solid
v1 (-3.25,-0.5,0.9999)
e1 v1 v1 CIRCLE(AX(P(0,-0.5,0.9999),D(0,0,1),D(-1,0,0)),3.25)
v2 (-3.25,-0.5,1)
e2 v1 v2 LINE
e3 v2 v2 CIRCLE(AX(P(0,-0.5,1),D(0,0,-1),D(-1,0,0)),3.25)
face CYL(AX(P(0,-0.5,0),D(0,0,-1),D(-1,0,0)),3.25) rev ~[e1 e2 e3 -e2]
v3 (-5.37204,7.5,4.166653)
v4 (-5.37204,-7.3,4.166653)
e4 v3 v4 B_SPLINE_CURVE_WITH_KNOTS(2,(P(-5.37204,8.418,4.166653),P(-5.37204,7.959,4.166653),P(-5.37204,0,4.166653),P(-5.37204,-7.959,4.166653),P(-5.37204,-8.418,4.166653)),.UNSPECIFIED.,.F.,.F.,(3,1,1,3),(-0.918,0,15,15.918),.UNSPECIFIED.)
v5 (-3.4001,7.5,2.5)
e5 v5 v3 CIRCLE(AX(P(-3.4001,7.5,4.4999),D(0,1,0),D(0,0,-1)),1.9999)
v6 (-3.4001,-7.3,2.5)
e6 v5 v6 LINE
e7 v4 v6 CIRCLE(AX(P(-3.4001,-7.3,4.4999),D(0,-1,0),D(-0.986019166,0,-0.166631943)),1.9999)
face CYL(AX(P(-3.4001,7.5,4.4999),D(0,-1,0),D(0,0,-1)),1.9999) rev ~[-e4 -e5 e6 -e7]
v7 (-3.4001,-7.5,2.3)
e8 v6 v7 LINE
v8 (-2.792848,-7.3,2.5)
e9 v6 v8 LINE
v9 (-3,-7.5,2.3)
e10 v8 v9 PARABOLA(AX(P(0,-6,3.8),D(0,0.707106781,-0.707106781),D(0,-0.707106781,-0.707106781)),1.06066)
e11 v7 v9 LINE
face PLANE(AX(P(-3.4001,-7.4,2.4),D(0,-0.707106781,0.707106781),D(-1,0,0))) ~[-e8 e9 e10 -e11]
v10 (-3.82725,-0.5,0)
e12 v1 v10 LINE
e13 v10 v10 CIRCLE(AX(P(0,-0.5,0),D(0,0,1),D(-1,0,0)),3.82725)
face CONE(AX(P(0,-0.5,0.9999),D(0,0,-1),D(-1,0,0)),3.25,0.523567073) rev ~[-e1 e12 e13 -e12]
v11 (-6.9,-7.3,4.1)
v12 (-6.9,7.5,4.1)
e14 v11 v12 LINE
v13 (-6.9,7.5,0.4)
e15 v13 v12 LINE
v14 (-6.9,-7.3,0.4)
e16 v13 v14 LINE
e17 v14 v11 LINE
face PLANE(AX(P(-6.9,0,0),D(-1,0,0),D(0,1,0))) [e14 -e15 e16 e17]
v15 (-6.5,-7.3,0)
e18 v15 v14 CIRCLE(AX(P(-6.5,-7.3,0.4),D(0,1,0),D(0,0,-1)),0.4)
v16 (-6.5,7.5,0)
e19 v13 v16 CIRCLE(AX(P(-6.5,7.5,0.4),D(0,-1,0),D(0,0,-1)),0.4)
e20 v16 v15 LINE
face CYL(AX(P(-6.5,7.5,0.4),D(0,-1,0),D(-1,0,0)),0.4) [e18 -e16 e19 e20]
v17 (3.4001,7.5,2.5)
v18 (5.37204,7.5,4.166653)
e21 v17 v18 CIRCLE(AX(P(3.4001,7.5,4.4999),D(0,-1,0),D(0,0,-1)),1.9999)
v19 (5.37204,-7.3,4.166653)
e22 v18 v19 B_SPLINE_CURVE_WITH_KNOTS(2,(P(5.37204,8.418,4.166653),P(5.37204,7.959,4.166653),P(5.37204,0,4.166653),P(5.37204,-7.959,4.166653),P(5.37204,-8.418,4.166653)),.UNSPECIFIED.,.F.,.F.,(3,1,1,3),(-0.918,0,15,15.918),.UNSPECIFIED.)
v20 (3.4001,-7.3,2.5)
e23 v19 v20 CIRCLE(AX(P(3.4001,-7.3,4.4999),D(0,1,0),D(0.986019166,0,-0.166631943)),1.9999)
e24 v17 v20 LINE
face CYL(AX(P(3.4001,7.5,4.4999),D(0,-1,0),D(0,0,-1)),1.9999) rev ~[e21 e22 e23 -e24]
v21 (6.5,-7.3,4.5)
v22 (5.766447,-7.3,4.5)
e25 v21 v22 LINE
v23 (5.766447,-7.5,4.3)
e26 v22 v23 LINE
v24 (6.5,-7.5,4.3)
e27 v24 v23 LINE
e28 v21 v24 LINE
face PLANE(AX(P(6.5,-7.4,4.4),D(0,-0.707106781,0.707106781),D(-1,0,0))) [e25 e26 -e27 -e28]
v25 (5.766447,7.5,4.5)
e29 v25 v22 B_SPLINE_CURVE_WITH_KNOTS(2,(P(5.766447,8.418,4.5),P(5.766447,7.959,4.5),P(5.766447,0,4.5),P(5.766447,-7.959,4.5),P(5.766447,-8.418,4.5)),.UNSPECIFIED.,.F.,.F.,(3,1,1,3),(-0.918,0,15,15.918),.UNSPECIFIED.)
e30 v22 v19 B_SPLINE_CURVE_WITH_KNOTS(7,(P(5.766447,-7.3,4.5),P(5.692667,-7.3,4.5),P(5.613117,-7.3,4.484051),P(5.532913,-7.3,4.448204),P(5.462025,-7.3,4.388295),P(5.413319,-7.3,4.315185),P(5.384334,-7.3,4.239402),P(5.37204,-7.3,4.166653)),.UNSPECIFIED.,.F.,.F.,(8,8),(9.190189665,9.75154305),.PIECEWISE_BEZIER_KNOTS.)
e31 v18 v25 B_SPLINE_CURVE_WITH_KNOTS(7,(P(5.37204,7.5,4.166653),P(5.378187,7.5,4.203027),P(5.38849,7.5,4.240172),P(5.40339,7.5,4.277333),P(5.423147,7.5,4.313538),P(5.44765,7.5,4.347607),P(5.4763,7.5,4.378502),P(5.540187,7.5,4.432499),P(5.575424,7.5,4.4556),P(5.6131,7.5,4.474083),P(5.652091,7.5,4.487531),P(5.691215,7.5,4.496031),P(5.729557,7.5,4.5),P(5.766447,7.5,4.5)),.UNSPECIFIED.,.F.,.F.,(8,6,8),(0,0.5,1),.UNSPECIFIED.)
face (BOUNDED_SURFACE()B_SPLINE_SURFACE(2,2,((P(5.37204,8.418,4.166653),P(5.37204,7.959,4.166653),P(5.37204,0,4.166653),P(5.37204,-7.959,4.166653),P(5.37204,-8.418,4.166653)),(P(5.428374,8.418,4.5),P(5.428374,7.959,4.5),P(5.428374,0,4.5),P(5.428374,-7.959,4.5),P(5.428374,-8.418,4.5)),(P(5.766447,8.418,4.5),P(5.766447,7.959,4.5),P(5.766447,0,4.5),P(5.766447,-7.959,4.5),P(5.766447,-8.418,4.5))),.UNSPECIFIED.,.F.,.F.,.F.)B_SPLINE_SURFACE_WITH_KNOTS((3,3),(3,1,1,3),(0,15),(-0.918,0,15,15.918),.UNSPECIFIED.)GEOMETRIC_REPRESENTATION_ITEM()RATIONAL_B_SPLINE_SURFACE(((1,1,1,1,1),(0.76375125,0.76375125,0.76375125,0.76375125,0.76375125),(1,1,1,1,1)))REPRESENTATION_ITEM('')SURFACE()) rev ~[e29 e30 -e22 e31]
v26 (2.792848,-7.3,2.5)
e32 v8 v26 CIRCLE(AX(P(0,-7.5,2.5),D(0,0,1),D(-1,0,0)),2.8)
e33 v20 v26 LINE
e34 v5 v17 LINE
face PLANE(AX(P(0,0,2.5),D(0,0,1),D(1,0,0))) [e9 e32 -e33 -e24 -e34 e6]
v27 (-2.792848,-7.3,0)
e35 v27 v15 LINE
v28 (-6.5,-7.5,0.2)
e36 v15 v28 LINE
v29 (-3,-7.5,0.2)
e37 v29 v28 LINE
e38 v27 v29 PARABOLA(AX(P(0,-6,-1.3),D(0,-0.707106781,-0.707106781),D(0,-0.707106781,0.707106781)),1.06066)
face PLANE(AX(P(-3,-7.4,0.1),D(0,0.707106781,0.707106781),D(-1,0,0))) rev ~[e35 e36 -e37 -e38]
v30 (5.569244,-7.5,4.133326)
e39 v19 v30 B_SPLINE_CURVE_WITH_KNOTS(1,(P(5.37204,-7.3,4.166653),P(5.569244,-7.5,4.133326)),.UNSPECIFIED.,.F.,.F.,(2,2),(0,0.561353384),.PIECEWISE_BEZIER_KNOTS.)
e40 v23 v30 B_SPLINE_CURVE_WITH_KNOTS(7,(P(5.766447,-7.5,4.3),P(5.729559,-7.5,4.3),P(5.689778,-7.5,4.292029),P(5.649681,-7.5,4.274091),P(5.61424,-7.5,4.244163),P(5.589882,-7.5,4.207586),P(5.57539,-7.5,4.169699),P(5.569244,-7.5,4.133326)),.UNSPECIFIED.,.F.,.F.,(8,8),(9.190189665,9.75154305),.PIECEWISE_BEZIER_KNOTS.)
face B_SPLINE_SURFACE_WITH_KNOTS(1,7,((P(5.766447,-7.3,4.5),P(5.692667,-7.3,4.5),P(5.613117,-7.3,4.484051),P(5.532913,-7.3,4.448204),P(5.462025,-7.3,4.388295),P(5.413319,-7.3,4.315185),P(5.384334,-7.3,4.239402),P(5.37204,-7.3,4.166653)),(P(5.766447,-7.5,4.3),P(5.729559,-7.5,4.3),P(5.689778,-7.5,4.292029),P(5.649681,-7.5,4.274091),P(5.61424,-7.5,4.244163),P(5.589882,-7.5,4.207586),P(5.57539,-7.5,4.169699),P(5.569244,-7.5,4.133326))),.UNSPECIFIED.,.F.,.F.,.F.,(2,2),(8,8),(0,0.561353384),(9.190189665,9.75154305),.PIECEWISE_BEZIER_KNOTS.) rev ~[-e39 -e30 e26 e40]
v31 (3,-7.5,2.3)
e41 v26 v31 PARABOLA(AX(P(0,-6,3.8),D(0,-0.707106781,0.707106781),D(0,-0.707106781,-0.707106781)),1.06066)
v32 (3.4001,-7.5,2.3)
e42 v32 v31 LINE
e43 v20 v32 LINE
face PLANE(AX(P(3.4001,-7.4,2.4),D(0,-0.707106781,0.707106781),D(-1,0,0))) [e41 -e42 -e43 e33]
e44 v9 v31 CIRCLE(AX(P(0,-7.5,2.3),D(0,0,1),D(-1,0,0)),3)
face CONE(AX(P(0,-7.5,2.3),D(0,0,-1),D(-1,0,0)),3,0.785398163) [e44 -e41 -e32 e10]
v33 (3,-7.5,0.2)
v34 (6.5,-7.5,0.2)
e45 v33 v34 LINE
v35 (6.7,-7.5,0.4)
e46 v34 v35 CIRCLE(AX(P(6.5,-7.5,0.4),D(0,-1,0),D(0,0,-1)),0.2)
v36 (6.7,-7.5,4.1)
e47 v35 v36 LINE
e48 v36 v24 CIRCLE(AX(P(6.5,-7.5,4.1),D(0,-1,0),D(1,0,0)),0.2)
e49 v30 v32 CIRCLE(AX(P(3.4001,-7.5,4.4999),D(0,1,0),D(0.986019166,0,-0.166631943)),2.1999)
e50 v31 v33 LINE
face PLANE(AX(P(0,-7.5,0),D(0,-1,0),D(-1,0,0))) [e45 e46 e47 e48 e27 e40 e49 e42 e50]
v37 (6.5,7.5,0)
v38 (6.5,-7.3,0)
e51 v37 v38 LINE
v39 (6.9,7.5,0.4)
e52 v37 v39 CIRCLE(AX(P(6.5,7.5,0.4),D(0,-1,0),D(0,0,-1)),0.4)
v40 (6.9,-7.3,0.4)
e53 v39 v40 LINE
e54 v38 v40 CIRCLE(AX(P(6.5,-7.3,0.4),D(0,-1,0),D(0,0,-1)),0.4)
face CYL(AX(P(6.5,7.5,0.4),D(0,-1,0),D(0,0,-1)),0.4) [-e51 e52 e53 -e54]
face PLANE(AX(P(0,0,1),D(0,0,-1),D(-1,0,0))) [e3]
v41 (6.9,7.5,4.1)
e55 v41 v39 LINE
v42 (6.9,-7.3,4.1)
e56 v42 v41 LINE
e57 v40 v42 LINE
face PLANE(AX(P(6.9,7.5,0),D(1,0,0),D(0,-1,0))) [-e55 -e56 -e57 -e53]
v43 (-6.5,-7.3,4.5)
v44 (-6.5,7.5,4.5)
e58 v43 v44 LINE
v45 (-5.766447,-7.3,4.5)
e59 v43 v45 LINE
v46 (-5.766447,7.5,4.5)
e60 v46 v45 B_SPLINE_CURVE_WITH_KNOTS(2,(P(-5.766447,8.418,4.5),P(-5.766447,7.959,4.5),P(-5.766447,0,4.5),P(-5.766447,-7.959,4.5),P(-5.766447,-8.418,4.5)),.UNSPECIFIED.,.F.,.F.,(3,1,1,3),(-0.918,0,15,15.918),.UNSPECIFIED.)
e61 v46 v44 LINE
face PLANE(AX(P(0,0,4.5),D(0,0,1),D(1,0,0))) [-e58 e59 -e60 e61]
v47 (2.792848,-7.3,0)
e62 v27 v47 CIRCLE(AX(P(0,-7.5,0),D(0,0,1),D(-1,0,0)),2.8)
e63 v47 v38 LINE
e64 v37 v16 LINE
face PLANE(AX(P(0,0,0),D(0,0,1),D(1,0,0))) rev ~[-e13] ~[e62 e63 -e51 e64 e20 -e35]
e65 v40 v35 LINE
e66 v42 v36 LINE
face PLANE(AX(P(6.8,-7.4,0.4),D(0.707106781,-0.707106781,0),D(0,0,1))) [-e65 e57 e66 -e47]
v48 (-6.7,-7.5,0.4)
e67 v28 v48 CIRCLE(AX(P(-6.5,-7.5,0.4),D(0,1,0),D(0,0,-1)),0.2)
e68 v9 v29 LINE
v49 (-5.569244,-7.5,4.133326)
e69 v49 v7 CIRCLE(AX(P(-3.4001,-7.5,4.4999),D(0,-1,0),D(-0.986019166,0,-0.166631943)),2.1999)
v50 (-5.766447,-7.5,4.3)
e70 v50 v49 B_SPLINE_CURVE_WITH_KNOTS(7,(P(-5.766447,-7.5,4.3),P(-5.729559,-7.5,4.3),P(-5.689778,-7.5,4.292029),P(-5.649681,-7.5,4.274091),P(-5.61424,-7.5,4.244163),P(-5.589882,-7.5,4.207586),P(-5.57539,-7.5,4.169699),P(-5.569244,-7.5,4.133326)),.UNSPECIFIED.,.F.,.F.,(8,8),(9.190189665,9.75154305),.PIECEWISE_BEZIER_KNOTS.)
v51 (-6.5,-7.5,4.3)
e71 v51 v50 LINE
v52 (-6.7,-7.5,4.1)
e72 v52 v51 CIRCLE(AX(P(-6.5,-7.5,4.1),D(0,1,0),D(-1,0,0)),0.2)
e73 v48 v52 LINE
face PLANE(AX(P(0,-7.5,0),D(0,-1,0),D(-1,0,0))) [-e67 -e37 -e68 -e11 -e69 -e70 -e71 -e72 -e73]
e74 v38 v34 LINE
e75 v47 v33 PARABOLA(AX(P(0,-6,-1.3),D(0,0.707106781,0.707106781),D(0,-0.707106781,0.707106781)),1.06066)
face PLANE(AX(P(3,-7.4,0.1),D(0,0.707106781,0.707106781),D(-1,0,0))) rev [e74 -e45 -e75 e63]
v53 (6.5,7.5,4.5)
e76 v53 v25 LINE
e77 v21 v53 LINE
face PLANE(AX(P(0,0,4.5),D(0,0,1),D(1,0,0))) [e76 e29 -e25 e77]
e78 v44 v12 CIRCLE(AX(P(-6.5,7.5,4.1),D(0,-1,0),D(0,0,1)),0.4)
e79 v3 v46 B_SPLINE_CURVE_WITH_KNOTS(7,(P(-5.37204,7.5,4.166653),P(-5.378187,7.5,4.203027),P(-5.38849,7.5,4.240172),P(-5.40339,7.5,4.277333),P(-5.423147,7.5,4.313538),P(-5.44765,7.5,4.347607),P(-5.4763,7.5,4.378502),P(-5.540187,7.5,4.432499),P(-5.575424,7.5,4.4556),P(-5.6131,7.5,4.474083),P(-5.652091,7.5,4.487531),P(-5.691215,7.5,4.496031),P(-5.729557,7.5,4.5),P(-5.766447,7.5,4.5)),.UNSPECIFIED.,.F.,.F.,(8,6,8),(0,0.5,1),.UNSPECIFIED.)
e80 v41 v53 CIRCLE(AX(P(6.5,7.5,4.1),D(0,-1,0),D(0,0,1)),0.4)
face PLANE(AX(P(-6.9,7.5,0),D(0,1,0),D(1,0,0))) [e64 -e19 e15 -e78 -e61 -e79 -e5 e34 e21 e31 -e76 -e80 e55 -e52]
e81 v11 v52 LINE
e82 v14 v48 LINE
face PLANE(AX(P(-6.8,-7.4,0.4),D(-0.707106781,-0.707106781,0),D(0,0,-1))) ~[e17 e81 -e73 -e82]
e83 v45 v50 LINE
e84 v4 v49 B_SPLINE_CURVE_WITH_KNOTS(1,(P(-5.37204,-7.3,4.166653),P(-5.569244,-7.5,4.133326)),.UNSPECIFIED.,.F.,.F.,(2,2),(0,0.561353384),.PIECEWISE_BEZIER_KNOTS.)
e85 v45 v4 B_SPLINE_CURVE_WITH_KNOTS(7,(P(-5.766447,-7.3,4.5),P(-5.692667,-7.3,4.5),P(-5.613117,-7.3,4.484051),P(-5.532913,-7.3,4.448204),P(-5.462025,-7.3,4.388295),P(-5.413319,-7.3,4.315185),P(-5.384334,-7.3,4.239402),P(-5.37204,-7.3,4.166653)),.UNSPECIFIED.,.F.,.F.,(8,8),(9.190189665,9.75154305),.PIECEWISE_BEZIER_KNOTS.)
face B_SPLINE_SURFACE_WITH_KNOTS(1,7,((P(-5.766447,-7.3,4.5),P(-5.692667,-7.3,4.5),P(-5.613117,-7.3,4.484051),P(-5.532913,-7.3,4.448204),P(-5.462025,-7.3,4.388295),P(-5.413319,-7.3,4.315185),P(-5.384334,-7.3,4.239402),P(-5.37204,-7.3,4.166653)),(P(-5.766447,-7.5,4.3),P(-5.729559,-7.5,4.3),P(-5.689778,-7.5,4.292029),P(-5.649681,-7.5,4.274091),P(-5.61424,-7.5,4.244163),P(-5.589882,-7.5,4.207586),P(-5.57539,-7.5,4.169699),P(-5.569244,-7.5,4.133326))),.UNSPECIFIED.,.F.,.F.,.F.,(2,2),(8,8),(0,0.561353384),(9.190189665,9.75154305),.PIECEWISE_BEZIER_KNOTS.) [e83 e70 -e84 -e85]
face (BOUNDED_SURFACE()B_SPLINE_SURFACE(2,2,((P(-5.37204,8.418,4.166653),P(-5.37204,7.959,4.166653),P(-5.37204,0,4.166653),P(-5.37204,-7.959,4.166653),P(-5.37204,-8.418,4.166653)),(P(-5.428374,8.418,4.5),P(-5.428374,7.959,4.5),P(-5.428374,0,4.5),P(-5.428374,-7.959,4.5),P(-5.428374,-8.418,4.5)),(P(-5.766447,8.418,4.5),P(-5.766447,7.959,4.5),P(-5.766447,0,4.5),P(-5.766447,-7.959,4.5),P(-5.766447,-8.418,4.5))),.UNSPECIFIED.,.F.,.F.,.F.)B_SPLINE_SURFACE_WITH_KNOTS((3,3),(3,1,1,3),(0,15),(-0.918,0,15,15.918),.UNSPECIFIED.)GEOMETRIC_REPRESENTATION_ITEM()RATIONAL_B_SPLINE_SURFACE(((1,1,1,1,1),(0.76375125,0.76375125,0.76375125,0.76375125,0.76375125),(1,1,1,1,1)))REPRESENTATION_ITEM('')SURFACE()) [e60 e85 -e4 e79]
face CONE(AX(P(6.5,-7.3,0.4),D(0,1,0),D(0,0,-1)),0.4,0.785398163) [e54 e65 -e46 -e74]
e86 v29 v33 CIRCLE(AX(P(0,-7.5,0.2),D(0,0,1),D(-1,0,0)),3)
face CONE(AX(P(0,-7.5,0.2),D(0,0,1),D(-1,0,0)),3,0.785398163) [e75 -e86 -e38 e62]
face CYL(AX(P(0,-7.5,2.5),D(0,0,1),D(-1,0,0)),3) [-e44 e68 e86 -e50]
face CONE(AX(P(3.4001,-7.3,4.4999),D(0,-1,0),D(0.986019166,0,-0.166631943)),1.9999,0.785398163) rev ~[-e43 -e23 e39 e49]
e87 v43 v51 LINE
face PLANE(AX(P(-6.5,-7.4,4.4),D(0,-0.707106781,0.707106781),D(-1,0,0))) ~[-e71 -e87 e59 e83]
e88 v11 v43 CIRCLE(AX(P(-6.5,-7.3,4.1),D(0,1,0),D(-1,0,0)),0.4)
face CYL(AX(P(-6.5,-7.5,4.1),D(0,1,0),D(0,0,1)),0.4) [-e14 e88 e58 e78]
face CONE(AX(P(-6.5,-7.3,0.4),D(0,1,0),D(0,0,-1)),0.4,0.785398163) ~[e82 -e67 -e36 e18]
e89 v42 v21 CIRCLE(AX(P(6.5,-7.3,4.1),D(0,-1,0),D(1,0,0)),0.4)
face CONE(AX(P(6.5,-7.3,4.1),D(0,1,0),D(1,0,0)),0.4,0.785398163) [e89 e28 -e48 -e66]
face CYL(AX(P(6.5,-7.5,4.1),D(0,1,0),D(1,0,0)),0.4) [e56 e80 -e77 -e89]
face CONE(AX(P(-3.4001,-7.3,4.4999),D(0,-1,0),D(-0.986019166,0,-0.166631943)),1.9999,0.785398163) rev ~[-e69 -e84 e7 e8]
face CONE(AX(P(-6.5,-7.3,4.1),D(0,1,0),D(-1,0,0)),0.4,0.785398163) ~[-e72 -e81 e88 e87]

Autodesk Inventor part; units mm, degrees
ref_plane "YZ Plane" through (0, 0, 0) normal (1, 0, 0) x (0, 1, 0)
ref_plane "XZ Plane" through (0, 0, 0) normal (0, 1, 0) x (-1, 0, 0)
ref_plane "XY Plane" through (0, 0, 0) normal (0, 0, 1) x (1, 0, 0)
sketch "Sketch1" plane through (0, 0, 0) normal (0, 0, 1) x (1, 0, 0)
  line L0 (-6.9, 7.5) -> (6.9, 7.5)
  line L1 (6.9, 7.5) -> (6.9, -7.5)
  line L2 (6.9, -7.5) -> (-6.9, -7.5)
  line L3 (-6.9, -7.5) -> (-6.9, 7.5)
  line L4 (0, -10.5) -> (0, 10.5) projected
  line L5 (-9.66, 0) -> (9.66, 0) projected
  point P0 (0, 0)
  dimension "d0" = 13.8
  dimension "d9" = 15
extrude "Extrusion1" add sketch "Sketch1" along normal blind 2.5
sketch "Sketch3" plane through (0, 0, 2.5) normal (0, 0, 1) x (1, 0, 0)
  line L0 (6.9, 7.5) -> (-6.9, 7.5) projected
  line L1 (-6.9, -7.5) -> (6.9, -7.5) projected
  line L2 (-6.9, 7.5) -> (-5.4, 7.5)
  line L3 (-5.4, 7.5) -> (-5.4, -7.5)
  line L4 (-5.4, -7.5) -> (-6.9, -7.5)
  line L5 (-6.9, -7.5) -> (-6.9, 7.5)
  line L6 (6.9, -7.5) -> (6.9, 7.5) projected
  line L7 (6.9, 7.5) -> (5.4, 7.5)
  line L8 (5.4, 7.5) -> (5.4, -7.5)
  line L9 (5.4, -7.5) -> (6.9, -7.5)
  line L10 (6.9, -7.5) -> (6.9, 7.5)
  point P0 (0, 0)
  point P1 (5.4, 7.5)
  point P2 (5.4, -7.5)
  dimension "d11" = 1.5
  dimension "d12" = 1.5
extrude "Extrusion3" add sketch "Sketch3" along normal blind 2 contours L6 L1 L8 L0 | L3 L1 L5 L0
fillet "Fillet2" radius 2 2 edges at (-5.4, 0, 2.5) (5.4, 0, 2.5)
fillet "Fillet2" radius 0.4 6 edges at (-5.4, 0, 4.5) (-6.9, 0, 4.5) (5.4, 0, 4.5) (6.9, 0, 4.5) (6.9, 0, 0) (-6.9, 0, 0)
sketch "Sketch4" plane through (0, 0, 2.5) normal (0, 0, 1) x (1, 0, 0)
  line L0 (-3.4, -7.5) -> (3.4, -7.5) projected
  arc A0 (-3, -7.5) -> (3, -7.5) centre (0, -7.5) ccw
  point P0 (0, 0)
  dimension "d17" = 3
extrude "Extrusion4" add sketch "Sketch4" against normal up to surface (2.5 mm away)
sketch "Sketch5" plane through (0, 0, 0) normal (0, 0, -1) x (-1, 0, 0)
  circle A0 centre (0, -0.5) radius 3.25
  line L0 (-3, -7.5) -> (-6.5, -7.5) construction
  line L1 (0, -15.3299) -> (0, 11.305) projected
  arc A1 (-3, -7.5) -> (3, -7.5) centre (0, -7.5) ccw projected
  point P0 (0, 0)
  dimension "d20" = 6.5
  dimension "d21" = 7
extrude "Extrusion5" cut sketch "Sketch5" against normal blind 1
chamfer "Chamfer2" distance 0.2 angle 45 16 edges at (0, -10.5, 2.5) (0, -10.5, 0) (-4.75, -7.5, 0) (6.7828, -7.5, 4.3828) (-6.7828, -7.5, 0.1172) (6.9, -7.5, 2.25) (6.1332, -7.5, 4.5) (-6.1332, -7.5, 4.5) (5.5082, -7.5, 4.4055) (-5.5082, -7.5, 4.4055) (-6.7828, -7.5, 4.3828) (4.6911, -7.5, 2.9725) (-4.6911, -7.5, 2.9725) (-3.2001, -7.5, 2.5) (3.2001, -7.5, 2.5) (-6.9, -7.5, 2.25)
chamfer "Chamfer3" distance 1 angle 30 1 edges at (3.25, -0.5, 0) measured on face at (-3.2395, -0.7615, 0.6667)
properties part number "Test_SampleHolder_Plate_M8Screw_big"
